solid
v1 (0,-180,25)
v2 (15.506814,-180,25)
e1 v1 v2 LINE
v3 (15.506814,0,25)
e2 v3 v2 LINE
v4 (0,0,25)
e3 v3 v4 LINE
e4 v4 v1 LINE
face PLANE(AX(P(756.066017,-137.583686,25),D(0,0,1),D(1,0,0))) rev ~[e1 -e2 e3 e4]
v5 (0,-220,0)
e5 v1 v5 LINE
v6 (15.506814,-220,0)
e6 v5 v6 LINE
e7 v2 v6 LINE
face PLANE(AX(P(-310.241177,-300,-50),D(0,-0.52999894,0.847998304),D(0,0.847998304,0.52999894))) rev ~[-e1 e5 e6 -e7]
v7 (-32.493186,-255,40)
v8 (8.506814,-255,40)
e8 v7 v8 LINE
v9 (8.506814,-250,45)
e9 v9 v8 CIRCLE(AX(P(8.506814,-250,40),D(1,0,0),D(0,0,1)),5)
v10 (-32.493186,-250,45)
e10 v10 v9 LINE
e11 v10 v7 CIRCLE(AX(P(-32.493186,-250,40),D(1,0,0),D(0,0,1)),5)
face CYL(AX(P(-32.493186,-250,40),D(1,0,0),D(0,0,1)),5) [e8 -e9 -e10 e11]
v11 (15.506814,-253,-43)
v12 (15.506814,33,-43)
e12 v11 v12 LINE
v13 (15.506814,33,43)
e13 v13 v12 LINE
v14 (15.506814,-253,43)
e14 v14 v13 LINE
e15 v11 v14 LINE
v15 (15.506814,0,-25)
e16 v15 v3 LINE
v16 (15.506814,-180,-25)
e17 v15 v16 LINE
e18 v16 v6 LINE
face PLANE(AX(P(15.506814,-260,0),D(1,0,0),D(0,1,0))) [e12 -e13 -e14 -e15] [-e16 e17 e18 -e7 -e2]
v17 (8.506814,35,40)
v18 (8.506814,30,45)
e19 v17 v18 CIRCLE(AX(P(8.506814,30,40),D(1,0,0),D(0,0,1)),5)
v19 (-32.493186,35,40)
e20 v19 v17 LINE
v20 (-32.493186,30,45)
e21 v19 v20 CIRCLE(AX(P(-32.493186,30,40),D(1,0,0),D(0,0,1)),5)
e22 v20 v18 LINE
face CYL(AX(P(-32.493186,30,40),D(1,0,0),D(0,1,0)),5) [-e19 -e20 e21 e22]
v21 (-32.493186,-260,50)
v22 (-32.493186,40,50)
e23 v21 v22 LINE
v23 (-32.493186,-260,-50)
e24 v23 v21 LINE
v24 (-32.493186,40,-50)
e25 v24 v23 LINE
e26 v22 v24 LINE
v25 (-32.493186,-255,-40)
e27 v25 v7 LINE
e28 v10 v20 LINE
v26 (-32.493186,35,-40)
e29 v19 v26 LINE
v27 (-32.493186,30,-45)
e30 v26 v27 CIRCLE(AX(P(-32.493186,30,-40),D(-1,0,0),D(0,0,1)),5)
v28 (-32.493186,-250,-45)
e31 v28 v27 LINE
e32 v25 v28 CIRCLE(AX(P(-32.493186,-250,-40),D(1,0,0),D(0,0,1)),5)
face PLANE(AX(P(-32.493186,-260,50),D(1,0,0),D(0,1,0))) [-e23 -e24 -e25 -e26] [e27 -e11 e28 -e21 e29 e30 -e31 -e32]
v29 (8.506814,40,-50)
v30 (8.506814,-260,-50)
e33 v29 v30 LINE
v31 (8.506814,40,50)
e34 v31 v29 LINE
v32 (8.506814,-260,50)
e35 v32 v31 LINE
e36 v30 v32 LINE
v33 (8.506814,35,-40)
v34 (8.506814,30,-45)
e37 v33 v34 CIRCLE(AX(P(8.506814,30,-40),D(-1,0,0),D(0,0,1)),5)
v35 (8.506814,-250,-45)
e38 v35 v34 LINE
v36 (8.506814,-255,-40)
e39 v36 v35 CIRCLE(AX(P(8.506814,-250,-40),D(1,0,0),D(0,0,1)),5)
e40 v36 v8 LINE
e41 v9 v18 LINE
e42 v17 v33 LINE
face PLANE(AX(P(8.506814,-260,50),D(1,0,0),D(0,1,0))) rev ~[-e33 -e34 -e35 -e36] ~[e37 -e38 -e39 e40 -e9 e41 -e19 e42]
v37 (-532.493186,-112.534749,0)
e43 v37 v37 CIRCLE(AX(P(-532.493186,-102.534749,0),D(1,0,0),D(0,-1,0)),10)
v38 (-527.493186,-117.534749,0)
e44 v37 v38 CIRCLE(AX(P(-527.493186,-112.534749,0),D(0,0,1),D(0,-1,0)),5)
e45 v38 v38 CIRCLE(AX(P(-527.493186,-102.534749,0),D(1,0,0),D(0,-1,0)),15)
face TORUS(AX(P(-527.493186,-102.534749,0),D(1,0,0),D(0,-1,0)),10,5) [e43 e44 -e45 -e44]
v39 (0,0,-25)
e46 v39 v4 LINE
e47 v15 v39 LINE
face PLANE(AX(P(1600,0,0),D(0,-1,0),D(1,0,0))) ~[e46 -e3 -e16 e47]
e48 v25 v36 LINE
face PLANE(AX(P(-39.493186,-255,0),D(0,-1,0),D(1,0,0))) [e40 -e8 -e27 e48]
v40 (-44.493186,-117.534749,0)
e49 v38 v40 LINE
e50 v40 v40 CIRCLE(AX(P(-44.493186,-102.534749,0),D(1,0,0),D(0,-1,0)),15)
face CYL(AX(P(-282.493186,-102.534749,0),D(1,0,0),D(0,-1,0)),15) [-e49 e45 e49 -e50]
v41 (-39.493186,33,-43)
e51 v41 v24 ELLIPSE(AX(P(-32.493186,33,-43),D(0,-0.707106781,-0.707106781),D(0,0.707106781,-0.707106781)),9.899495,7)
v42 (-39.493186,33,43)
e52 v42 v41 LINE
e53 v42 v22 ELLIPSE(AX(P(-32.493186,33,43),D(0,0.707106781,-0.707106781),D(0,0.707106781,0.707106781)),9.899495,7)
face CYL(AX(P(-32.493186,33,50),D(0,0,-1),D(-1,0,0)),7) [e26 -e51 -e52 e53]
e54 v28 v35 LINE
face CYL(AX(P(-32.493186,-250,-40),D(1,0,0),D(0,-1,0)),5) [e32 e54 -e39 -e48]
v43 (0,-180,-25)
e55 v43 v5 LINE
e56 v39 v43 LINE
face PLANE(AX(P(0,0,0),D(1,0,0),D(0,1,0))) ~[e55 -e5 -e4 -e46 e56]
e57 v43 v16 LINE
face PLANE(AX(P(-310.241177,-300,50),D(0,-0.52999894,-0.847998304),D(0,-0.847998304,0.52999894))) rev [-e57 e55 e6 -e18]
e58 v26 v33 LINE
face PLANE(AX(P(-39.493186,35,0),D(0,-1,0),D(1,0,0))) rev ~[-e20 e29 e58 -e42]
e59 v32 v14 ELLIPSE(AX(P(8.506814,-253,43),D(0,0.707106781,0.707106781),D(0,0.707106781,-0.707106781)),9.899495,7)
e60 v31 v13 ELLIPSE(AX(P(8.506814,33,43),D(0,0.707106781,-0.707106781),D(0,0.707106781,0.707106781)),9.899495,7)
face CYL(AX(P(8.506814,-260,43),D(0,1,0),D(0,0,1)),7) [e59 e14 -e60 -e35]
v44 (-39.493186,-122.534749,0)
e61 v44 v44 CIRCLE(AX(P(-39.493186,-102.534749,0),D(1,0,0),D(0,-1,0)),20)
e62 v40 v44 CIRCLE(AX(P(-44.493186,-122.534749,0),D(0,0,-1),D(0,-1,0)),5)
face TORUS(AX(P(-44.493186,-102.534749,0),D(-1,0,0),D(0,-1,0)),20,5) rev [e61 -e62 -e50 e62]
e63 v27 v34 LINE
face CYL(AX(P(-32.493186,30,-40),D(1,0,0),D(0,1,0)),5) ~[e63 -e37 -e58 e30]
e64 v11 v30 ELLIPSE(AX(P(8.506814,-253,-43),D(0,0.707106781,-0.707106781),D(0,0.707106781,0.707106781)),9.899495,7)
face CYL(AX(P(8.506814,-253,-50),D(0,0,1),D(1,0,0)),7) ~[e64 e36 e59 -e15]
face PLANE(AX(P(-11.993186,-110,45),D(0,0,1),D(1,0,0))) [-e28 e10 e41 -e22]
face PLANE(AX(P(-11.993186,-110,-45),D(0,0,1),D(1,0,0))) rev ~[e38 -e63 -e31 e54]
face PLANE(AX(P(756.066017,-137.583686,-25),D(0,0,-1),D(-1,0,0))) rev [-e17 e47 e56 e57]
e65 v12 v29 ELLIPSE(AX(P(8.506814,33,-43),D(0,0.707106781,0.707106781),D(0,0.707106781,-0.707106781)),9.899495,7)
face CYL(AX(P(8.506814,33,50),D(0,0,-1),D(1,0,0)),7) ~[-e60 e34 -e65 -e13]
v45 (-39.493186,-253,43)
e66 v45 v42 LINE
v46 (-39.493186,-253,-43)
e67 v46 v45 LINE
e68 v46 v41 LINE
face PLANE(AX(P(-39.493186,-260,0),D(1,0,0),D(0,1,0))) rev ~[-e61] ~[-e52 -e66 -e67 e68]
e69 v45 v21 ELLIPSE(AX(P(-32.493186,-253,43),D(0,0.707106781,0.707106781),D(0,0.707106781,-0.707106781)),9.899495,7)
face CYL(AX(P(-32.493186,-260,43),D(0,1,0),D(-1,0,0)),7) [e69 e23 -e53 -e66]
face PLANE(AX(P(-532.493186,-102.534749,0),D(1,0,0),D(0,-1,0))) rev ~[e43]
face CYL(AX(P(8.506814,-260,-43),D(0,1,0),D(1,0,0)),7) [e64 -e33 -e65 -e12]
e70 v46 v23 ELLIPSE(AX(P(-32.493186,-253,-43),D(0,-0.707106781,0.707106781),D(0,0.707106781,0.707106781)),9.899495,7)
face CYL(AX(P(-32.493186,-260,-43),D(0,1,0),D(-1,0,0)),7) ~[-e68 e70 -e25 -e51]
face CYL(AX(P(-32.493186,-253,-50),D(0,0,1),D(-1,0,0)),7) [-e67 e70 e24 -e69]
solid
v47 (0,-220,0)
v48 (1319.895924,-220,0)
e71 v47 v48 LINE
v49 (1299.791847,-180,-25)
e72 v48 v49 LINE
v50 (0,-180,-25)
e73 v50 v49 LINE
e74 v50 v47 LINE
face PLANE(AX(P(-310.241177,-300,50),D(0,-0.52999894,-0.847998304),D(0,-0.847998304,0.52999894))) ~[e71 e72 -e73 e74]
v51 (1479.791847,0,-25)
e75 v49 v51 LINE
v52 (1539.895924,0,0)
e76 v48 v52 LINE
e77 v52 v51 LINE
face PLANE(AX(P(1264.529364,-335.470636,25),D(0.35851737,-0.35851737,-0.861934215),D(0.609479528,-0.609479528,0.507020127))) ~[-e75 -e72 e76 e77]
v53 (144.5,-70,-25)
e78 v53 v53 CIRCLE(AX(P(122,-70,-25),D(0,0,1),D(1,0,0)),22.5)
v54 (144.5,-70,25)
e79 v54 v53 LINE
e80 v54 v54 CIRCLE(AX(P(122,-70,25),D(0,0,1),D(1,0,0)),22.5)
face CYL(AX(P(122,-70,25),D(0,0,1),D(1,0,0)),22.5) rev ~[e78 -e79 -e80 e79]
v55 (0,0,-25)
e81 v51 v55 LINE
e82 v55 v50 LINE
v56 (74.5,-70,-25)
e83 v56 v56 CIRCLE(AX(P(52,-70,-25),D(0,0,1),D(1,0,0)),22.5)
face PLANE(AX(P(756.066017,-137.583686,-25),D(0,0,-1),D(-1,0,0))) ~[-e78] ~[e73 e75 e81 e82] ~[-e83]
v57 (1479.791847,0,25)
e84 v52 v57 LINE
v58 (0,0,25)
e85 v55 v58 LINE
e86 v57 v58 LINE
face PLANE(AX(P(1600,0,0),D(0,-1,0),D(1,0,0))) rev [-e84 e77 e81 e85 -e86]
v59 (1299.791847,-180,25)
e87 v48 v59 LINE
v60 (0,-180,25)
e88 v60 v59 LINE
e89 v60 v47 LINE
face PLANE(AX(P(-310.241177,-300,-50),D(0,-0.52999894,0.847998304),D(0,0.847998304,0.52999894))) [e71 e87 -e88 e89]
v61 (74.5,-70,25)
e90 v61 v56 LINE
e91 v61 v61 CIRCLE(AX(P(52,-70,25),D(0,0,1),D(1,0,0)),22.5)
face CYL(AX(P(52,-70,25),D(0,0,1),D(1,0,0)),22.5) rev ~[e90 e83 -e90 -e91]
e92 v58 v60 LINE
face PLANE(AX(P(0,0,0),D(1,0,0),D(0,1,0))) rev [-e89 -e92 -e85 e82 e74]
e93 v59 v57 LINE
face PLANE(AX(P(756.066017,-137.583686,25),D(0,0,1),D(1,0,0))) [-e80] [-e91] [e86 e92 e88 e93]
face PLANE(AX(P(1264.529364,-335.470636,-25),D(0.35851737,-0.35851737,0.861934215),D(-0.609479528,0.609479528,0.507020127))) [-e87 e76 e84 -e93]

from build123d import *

# Parameters (mm, degrees)
F1_DEPTH    = 25
F2_T1_DEPTH = 1920.4823536212
F3_T1_DEPTH = 694.2958053538
F5_R        = 22.5
F6_DEPTH    = 100
F7_W        = 55
F7_H        = 300
F8_DEPTH    = 50
F9_R        = 7
F10_DEPTH   = 5
F11_DEPTH   = 5
F12_DEPTH   = 5
F13_DEPTH   = 5
F14_R       = 5
F15_W       = 500
F15_H       = 15
F17_R       = 5
F18_R       = 5


# Not quite as in the source:
# - a fillet or chamfer that OpenCascade refuses, or shapes differently, is made with other operations: its cross-section is extruded or revolved along the edge and cut away or added
# - a feature names something its author has since deleted; it is built from what else it names


with BuildPart() as f1:
    # F0 (on Top) → F1 (new body)
    with BuildSketch(Plane.XY):
        Polygon((1600, 0), (0, 0), (0, -300), (1300, -300), align=None)
    extrude(amount=F1_DEPTH)

    # F2: chamfer of 120 x 75 on 1 edges, made by hand

    # F2_s2 → F2_t1 (cut)
    with BuildSketch(Plane.YZ.offset(-310.2411768106)):
        Polygon((-300, -50), (-180, 25), (-300, 25), align=None)
    extrude(amount=F2_T1_DEPTH, mode=Mode.SUBTRACT)

    # F3: chamfer of 50 x 85 on 1 edges, made by hand

    # F3_s2 → F3_t1 (cut)
    with BuildSketch(Plane(origin=(464.5293639425, 464.5293639425, 0), x_dir=(0, 0, 1), z_dir=(0.7071067812, 0.7071067812, 0))):
        Polygon((-25, 1131.3708498985), (25, 1046.3708498985), (25, 1131.3708498985), align=None)
    extrude(amount=F3_T1_DEPTH, mode=Mode.SUBTRACT)

    # F4: F1 across face


with BuildPart() as f1_1:
    add(f1.part)
    add(f1.part.mirror(Plane(origin=(716.3583208568, -107.1792818856, 0), x_dir=(1, 0, 0), z_dir=(0, 0, -1))))

    # F5 (on face) → F6 (cut)
    with BuildSketch(Plane.XY.offset(25)):
        with Locations((52, -70)):
            Circle(F5_R)
        with Locations((122, -70)):
            Circle(F5_R)
    extrude(amount=-F6_DEPTH, mode=Mode.SUBTRACT)


with BuildPart() as f8:
    # F7 (on Top) → F8 (new body, symmetric)
    with BuildSketch(Plane.XY):
        with Locations((-11.9931862531, -110)):
            Rectangle(F7_W, F7_H)
    extrude(amount=F8_DEPTH, both=True)

    # F9
    f9_edges = [f8.edges().sort_by_distance(p)[0] for p in [
        (15.506814, -110, 50),
        (15.506814, -110, -50),
        (-39.493186, -110, 50),
        (-39.493186, -260, 0),
        (-39.493186, -110, -50),
        (-39.493186, 40, 0),
        (15.506814, -260, 0),
        (15.506814, 40, 0),
    ]]
    fillet(f9_edges, radius=F9_R)

    # F10 (cut): a face of the model
    f10_faces = [f8.faces().sort_by_distance(p)[0] for p in [
        (-11.9931862531, -110, 50),
    ]]
    extrude(f10_faces, amount=-F10_DEPTH, mode=Mode.SUBTRACT)

    # F11 (cut): a face of the model
    f11_faces = [f8.faces().sort_by_distance(p)[0] for p in [
        (-11.9931862531, -260, -2.5),
    ]]
    extrude(f11_faces, amount=-F11_DEPTH, mode=Mode.SUBTRACT)

    # F12 (cut): a face of the model
    f12_faces = [f8.faces().sort_by_distance(p)[0] for p in [
        (-11.9931862531, -107.5, -50),
    ]]
    extrude(f12_faces, amount=-F12_DEPTH, mode=Mode.SUBTRACT)

    # F13 (cut): a face of the model
    f13_faces = [f8.faces().sort_by_distance(p)[0] for p in [
        (-11.9931862531, 40, 0),
    ]]
    extrude(f13_faces, amount=-F13_DEPTH, mode=Mode.SUBTRACT)

    # F14
    f14_edges = [f8.edges().sort_by_distance(p)[0] for p in [
        (-11.993186, -255, 45),
        (-11.993186, -255, -45),
        (-11.993186, 35, -45),
        (-11.993186, 35, 45),
    ]]
    fillet(f14_edges, radius=F14_R)

    # F15 (on Top) → F16 (revolve)
    with BuildSketch(Plane.XY):
        with Locations((-282.4931862531, -110.0347492099)):
            Rectangle(F15_W, F15_H)
    revolve(axis=Axis((-282.4931862531, -102.5347492099, 0), (1, 0, 0)))

    # F17
    f17_edges = [f8.edges().sort_by_distance(p)[0] for p in [
        (-532.493186, -87.534749, 0),
    ]]
    fillet(f17_edges, radius=F17_R)

    # F18
    f18_edges = [f8.edges().sort_by_distance(p)[0] for p in [
        (-39.493186, -87.534749, 0),
    ]]
    fillet(f18_edges, radius=F18_R)

    # F19: cut F1
    add(f1_1.part, mode=Mode.SUBTRACT)


solid = Compound([f1_1.part, f8.part])
